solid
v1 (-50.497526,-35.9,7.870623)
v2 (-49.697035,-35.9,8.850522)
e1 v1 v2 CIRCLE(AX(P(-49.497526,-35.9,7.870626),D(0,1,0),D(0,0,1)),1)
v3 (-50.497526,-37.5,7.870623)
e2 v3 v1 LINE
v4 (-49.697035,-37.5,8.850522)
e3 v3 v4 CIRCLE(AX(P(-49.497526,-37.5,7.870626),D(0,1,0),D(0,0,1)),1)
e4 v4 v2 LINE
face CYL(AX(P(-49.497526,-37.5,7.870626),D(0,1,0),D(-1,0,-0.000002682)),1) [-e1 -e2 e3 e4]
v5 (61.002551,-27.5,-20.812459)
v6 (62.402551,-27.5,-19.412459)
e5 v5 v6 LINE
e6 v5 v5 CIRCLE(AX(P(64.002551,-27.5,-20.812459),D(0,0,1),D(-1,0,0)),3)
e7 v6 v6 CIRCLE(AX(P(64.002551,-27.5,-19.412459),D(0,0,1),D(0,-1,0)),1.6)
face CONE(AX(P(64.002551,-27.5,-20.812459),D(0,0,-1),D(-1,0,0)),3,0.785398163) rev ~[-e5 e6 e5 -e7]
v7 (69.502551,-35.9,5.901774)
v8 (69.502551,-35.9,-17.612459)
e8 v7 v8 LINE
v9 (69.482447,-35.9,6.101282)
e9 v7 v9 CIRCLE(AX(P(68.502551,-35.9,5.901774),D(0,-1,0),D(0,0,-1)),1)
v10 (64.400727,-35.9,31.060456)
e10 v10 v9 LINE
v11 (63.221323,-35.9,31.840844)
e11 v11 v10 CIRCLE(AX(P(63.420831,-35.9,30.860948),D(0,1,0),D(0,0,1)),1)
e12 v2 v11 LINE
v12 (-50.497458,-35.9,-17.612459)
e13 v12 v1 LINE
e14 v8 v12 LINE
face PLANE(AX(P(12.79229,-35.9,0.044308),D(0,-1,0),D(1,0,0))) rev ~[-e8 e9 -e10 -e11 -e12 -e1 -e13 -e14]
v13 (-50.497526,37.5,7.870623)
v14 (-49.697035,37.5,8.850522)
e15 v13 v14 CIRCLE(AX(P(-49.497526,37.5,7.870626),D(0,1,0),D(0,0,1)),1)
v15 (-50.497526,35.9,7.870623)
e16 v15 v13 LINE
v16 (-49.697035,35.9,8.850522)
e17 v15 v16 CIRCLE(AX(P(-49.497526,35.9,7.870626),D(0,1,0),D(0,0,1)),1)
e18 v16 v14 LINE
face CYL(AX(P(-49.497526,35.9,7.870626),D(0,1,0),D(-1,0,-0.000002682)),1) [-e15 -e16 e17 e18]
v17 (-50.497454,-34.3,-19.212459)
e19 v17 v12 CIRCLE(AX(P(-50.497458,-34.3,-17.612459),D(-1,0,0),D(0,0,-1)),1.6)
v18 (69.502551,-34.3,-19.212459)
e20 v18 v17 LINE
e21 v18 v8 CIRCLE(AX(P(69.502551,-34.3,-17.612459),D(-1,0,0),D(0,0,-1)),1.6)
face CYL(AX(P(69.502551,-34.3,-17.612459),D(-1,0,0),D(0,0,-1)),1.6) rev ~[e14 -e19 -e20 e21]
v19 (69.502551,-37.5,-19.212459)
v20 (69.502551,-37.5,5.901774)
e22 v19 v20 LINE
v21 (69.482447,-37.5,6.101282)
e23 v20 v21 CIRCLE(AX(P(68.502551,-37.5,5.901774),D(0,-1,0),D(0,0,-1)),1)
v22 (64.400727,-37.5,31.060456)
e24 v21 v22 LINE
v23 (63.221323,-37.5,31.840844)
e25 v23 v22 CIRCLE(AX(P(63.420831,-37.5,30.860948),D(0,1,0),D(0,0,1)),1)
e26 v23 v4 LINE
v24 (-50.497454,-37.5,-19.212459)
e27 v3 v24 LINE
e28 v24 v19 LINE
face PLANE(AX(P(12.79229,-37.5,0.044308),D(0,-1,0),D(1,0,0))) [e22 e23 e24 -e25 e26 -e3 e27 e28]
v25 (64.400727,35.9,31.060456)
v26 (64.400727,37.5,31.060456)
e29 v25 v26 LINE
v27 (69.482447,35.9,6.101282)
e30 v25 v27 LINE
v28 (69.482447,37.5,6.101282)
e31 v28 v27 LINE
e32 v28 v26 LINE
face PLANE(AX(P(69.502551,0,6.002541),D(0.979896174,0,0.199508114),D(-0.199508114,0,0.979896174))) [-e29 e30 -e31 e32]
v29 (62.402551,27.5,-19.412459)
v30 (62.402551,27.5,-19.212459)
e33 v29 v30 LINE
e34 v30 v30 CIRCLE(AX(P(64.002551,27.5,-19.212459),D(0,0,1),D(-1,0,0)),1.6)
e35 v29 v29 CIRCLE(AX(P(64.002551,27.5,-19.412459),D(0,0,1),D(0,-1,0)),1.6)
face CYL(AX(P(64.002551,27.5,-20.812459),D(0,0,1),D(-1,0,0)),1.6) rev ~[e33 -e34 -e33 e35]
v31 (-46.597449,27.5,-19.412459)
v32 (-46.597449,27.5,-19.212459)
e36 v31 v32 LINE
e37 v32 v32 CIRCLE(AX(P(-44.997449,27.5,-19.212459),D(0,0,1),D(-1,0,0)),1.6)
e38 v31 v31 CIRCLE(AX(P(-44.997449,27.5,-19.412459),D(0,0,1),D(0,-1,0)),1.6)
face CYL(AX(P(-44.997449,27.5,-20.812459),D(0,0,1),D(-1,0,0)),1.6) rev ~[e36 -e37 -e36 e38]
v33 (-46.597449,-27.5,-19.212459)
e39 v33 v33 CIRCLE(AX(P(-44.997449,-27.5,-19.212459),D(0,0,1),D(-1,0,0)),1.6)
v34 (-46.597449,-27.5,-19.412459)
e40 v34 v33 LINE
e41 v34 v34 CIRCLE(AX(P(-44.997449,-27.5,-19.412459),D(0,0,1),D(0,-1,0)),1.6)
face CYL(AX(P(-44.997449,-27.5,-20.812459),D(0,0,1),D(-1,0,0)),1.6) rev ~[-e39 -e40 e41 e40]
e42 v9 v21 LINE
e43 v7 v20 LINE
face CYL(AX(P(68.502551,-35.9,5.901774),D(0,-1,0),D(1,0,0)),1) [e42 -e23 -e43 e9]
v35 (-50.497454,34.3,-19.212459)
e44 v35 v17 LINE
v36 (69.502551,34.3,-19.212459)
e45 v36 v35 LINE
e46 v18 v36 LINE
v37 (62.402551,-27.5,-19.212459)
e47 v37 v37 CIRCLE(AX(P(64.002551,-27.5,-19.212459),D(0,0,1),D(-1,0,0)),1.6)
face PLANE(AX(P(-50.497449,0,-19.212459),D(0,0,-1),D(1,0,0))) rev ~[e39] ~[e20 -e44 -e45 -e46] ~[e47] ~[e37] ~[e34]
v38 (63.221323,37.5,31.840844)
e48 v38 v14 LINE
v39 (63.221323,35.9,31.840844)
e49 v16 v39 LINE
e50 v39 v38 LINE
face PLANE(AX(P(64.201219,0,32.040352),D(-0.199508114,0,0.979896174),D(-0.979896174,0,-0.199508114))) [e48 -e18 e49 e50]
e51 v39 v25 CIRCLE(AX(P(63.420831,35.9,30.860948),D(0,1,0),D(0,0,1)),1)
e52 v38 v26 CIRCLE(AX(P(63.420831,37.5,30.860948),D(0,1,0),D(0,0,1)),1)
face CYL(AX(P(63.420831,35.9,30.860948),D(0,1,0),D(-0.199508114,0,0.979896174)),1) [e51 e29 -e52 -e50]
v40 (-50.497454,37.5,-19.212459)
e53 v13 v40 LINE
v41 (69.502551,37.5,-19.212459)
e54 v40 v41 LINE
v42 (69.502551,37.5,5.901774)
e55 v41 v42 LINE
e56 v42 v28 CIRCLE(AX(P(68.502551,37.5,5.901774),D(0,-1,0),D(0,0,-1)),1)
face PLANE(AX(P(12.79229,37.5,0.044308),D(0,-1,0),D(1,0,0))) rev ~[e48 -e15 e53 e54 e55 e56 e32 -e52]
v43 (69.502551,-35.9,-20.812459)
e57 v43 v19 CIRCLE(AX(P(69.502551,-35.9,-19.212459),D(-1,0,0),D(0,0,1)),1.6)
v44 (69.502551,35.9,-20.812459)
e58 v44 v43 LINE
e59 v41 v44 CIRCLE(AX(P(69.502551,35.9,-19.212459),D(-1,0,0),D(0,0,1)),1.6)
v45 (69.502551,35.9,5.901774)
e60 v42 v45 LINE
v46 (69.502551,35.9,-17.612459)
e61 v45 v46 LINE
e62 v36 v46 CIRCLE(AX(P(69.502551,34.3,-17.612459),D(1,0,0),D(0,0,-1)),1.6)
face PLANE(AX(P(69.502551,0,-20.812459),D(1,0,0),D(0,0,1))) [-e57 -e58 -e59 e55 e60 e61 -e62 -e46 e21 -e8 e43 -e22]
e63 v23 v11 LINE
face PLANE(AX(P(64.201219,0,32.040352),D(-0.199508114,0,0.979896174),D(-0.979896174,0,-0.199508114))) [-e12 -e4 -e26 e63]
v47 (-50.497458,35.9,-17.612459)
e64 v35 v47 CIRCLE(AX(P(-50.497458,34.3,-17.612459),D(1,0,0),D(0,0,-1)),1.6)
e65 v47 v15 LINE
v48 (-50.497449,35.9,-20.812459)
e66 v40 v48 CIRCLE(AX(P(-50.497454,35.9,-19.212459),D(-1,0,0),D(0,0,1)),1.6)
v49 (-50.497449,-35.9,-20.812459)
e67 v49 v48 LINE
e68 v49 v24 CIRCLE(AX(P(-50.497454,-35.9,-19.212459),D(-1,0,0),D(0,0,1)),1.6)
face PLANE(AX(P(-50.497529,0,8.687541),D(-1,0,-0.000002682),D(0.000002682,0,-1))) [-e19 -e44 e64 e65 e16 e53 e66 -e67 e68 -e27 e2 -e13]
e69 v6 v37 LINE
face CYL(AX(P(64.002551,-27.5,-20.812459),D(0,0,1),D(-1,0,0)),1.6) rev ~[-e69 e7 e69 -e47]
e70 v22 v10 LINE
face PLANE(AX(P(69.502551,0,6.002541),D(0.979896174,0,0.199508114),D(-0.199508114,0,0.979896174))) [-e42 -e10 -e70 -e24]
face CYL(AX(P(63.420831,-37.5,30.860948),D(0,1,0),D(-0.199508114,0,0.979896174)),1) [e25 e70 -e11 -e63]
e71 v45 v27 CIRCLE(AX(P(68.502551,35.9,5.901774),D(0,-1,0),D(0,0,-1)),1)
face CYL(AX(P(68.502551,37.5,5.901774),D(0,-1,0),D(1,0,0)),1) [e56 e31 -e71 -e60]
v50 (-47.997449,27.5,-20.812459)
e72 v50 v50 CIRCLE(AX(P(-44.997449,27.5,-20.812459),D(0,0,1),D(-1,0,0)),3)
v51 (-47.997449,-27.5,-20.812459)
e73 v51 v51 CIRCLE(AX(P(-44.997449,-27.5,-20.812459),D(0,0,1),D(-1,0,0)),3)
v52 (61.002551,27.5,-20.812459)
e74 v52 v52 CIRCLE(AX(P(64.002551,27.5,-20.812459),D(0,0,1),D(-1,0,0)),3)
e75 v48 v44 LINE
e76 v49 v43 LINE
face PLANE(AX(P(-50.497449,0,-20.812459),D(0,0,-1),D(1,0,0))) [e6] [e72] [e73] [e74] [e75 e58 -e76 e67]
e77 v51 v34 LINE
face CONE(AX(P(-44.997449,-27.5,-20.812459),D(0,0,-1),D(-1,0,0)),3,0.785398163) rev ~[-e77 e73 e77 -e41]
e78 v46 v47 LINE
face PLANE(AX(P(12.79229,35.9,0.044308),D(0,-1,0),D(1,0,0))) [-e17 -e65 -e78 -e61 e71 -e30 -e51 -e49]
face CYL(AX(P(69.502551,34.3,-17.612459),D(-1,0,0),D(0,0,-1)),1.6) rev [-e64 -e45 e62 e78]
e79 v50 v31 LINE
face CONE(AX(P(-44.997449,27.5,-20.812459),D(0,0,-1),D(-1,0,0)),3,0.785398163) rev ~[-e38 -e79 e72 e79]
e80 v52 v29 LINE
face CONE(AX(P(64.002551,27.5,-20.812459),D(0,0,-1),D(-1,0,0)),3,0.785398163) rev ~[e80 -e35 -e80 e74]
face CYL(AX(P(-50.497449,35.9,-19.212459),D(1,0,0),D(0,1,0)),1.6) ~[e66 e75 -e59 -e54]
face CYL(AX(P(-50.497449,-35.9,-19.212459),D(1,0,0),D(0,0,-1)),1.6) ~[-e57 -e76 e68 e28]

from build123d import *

# Parameters (mm, degrees)
F1_DEPTH       = 37.5
F2_T           = -1.6
F3_R           = 1.6
F5_D           = 3.2
F5_CSINK_D     = 6
F5_CSINK_ANGLE = 90
F6_R           = 1.6
F7_R           = 1


# Not quite as in the source:
# - a feature names something its author has since deleted; it is built from what else it names


with BuildPart() as f1:
    # F0 (on Front) → F1 (new body, symmetric)
    with BuildSketch(Plane.XZ):
        Polygon((-50.4974494928, -20.8124593111), (69.5025505072, -20.8124593111), (69.5025505072, 6.0025406889), (64.2012187523, 32.0403523478), (-50.4975286176, 8.6875406888), align=None)
    extrude(amount=F1_DEPTH, both=True)

    # F2
    f2_openings = [f1.faces().sort_by_distance(p)[0] for p in [
        (-50.497489, 0, -6.062459),
        (6.851845, 0, 20.363947),
        (66.851885, 0, 19.021447),
        (69.502551, 0, -7.404959),
    ]]
    offset(amount=F2_T, openings=f2_openings, kind=Kind.INTERSECTION)

    # F3
    f3_edges = [f1.edges().sort_by_distance(p)[0] for p in [
        (9.502548, -35.9, -19.212459),
        (9.502548, 35.9, -19.212459),
    ]]
    fillet(f3_edges, radius=F3_R)

    # F5 (through all)
    with Locations(Plane(origin=(0, 0, -20.8124593111), x_dir=(1, 0, 0), z_dir=(0, 0, -1))):
        with Locations((64.0025505072, -27.5), (-44.9974494928, -27.5), (64.0025505072, 27.5), (-44.9974494928, 27.5)):
            CounterSinkHole(F5_D / 2, F5_CSINK_D / 2, counter_sink_angle=F5_CSINK_ANGLE)

    # F6
    f6_edges = [f1.edges().sort_by_distance(p)[0] for p in [
        (9.502551, 37.5, -20.812459),
        (9.502551, -37.5, -20.812459),
    ]]
    fillet(f6_edges, radius=F6_R)

    # F7
    f7_edges = [f1.edges().sort_by_distance(p)[0] for p in [
        (64.201219, -36.7, 32.040352),
        (64.201219, 36.7, 32.040352),
        (69.502551, 36.7, 6.002541),
        (69.502551, -36.7, 6.002541),
        (-50.497529, -36.7, 8.687541),
        (-50.497529, 36.7, 8.687541),
    ]]
    fillet(f7_edges, radius=F7_R)


solid = f1.part
